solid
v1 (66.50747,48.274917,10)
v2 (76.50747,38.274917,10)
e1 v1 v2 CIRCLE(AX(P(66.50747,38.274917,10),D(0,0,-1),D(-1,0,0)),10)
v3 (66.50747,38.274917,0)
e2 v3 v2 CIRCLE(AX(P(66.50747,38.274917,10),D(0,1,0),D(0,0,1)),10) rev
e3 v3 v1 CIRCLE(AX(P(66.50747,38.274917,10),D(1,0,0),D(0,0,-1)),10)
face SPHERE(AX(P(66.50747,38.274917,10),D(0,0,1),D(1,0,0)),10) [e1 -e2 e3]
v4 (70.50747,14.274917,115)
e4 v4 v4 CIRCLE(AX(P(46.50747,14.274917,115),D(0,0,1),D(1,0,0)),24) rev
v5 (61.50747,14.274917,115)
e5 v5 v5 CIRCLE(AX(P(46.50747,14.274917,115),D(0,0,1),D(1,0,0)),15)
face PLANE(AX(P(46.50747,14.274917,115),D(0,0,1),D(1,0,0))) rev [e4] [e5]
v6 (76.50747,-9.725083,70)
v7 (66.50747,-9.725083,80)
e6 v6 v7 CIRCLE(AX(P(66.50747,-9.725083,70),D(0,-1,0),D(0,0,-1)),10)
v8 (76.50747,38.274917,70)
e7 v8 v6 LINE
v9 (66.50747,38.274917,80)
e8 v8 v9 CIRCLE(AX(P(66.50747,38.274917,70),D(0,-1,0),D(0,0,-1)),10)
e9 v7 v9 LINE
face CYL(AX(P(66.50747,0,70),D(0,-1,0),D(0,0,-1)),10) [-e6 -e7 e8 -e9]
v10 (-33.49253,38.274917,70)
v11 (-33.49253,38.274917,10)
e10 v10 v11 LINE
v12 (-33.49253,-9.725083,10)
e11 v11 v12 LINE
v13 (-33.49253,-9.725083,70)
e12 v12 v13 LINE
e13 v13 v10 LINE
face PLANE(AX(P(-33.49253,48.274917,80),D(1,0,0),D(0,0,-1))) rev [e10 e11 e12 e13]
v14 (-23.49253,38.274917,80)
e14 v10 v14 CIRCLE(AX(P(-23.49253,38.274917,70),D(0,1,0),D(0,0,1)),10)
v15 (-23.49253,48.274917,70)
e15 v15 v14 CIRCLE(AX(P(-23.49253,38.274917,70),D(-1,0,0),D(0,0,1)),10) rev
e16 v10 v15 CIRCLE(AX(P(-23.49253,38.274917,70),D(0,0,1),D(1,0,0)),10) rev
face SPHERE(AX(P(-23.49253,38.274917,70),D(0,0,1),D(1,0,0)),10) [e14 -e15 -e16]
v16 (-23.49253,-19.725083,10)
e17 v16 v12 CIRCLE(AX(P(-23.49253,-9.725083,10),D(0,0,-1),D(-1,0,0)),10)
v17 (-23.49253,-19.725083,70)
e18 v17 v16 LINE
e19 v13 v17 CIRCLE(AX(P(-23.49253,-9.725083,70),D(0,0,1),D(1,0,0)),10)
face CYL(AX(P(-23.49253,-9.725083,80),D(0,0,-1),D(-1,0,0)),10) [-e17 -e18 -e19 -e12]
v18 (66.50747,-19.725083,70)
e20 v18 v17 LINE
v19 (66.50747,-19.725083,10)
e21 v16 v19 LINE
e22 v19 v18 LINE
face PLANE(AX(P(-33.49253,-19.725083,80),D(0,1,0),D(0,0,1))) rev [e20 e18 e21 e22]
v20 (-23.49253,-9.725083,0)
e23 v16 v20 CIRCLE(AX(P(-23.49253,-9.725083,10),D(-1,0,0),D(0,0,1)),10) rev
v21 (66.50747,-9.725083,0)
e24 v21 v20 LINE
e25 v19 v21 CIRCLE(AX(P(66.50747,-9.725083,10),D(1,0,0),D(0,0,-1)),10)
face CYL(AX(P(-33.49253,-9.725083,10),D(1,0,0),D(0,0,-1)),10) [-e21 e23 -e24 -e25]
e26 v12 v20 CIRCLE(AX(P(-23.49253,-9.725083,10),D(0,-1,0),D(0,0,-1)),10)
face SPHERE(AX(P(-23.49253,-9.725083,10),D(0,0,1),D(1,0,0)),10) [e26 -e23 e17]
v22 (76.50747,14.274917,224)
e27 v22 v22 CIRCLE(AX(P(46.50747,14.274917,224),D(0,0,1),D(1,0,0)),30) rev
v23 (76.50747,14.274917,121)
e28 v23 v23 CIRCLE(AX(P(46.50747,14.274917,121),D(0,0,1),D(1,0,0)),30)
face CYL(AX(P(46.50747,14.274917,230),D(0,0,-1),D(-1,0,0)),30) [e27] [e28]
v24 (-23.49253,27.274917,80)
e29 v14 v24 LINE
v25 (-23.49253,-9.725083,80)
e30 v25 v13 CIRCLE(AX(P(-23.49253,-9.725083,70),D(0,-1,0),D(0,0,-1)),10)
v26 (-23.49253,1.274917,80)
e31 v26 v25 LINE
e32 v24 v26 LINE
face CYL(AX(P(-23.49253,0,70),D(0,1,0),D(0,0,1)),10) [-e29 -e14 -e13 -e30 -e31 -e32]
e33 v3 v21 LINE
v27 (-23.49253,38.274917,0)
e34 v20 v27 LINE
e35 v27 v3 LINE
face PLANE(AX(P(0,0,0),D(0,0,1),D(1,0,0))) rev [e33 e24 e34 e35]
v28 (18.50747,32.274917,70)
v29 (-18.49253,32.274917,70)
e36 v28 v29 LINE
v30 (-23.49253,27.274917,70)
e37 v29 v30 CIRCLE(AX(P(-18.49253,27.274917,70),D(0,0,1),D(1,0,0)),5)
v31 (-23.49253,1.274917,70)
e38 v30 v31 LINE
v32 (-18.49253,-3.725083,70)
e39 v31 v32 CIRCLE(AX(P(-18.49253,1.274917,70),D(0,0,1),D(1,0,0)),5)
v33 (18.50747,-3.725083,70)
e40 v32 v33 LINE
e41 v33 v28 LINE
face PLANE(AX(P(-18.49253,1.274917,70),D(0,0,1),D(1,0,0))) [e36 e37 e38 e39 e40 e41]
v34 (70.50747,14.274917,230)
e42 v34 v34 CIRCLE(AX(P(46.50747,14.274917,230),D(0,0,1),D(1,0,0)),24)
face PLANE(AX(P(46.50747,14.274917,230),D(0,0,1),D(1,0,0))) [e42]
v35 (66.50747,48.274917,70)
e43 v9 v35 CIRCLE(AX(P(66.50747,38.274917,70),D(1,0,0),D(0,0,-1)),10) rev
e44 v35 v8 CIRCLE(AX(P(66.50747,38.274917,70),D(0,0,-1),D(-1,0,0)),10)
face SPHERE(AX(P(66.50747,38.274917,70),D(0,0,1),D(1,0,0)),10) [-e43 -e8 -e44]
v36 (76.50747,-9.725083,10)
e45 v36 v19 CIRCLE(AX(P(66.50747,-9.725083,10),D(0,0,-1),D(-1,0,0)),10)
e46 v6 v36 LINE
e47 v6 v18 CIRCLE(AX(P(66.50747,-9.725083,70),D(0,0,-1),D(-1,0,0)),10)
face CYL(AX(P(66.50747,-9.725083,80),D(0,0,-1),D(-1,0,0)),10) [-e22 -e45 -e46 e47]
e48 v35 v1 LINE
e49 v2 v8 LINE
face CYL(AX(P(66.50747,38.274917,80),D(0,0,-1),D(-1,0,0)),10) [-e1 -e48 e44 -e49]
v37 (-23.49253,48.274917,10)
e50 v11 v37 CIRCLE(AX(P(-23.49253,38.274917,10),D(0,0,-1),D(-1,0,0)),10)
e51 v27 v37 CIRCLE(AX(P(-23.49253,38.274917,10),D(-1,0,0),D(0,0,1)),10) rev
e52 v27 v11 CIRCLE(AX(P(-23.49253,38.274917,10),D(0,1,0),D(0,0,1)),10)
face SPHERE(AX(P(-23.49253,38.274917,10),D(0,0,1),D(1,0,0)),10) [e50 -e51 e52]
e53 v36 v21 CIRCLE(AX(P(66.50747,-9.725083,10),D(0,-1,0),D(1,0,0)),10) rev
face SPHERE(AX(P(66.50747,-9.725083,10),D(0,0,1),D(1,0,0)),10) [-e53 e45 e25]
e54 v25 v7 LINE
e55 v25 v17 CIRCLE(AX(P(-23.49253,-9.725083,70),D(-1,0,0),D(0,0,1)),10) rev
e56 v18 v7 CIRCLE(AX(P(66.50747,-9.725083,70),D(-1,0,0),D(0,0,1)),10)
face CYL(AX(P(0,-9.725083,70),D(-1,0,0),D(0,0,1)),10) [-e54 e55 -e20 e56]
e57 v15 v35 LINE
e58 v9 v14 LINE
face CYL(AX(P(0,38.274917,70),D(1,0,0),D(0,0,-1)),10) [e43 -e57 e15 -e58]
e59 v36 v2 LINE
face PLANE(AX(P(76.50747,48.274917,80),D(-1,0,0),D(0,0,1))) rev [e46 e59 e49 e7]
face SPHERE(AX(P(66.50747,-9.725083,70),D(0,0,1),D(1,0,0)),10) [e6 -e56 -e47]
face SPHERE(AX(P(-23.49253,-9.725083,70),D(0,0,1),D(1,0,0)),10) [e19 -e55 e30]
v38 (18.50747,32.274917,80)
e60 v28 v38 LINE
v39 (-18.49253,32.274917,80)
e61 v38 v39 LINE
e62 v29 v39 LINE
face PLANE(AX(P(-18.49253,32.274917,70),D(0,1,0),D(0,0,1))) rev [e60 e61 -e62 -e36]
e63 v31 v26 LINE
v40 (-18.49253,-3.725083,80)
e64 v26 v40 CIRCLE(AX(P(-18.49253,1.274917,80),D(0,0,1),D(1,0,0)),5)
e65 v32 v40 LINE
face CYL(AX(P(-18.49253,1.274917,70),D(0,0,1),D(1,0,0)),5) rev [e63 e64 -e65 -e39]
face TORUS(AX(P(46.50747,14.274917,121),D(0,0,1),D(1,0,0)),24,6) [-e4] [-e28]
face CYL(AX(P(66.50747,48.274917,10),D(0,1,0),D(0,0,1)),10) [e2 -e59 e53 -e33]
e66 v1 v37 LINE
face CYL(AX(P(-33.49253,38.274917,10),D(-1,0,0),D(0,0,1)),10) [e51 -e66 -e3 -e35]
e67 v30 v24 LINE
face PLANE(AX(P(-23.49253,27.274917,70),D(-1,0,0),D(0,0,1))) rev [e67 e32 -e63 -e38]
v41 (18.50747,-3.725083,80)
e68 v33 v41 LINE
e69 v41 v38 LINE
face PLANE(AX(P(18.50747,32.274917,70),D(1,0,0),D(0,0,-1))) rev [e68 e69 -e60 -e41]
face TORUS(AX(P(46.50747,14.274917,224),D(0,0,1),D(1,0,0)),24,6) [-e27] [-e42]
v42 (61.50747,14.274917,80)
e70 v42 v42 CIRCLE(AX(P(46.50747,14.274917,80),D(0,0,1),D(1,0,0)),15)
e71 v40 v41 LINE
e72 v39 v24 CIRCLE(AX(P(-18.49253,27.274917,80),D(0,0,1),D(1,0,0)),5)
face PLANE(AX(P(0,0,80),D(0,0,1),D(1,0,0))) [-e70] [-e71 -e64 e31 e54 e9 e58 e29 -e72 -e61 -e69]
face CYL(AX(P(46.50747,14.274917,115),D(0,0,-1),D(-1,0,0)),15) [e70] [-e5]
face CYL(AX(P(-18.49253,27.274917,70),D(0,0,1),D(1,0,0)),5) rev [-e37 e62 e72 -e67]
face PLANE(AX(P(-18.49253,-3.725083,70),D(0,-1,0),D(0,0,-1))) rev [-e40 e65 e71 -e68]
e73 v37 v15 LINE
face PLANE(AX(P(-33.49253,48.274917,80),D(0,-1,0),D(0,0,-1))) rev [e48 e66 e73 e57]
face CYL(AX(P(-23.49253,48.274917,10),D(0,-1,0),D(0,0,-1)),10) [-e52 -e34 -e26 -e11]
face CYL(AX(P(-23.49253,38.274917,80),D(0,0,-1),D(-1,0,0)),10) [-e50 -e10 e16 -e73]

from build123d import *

# Parameters (mm, degrees)
ESQUISSE1_W             = 110
ESQUISSE1_H             = 68
BOSS_EXTRU_1_DEPTH      = 80
ESQUISSE2_R             = 30
BOSS_EXTRU_2_DEPTH      = 150
CONG_2_R                = 6
ESQUISSE8_R             = 30
ESQUISSE8_R_2           = 15
ENL_V_MAT_EXTRU_1_DEPTH = 35
CONG_3_R                = 6
CONG_4_R                = 10
CONG_5_R                = 10
ENL_V_MAT_EXTRU_2_DEPTH = 10


with BuildPart() as part:
    # Esquisse1 → Boss.-Extru.1 (new body)
    with BuildSketch(Plane.XY):
        with Locations((21.507469619, 14.274916944)):
            Rectangle(ESQUISSE1_W, ESQUISSE1_H)
    extrude(amount=BOSS_EXTRU_1_DEPTH)

    # Esquisse2 → Boss.-Extru.2 (add)
    with BuildSketch(Plane.XY.offset(80)):
        with Locations((46.507469619, 14.274916944)):
            Circle(ESQUISSE2_R)
    extrude(amount=BOSS_EXTRU_2_DEPTH)

    # Congé2
    cong_2_edges = [part.edges().sort_by_distance(p)[0] for p in [
        (16.507469619, 14.274916944, 230),
    ]]
    fillet(cong_2_edges, radius=CONG_2_R)

    # Esquisse8 → Enlèv. mat.-Extru.1 (cut)
    with BuildSketch(Plane.XY.offset(80)):
        with Locations((46.507469619, 14.274916944)):
            Circle(ESQUISSE8_R)
        with Locations((46.507469619, 14.274916944)):
            Circle(ESQUISSE8_R_2, mode=Mode.SUBTRACT)
    extrude(amount=ENL_V_MAT_EXTRU_1_DEPTH, mode=Mode.SUBTRACT)

    # Congé3
    cong_3_edges = [part.edges().sort_by_distance(p)[0] for p in [
        (16.507469619, 14.274916944, 115),
    ]]
    fillet(cong_3_edges, radius=CONG_3_R)

    # Congé4
    cong_4_edges = [part.edges().sort_by_distance(p)[0] for p in [
        (21.507469619, 48.274916944, 80),
        (-33.492530381, 14.274916944, 80),
        (21.507469619, 48.274916944, 0),
        (76.507469619, 14.274916944, 0),
        (21.507469619, -19.725083056, 0),
        (-33.492530381, 14.274916944, 0),
        (21.507469619, -19.725083056, 80),
        (-33.492530381, 48.274916944, 40),
        (76.507469619, 48.274916944, 40),
        (76.507469619, -19.725083056, 40),
        (-33.492530381, -19.725083056, 40),
    ]]
    fillet(cong_4_edges, radius=CONG_4_R)

    # Congé5
    # the kernel refuses this fillet: 10 mm, written as the material it takes off along each edge
    with BuildSketch(Plane(origin=(66.507469619, -9.725083056, 70), x_dir=(1, 0, 0), z_dir=(0, 0, 1))) as cong_5_piece_1_section:
        Polygon((0, 0), (CONG_5_R, 0), (CONG_5_R, -CONG_5_R), (0, -CONG_5_R), align=None)
    cong_5_piece_1 = extrude(amount=CONG_5_R, mode=Mode.PRIVATE)
    cong_5_piece_1 = cong_5_piece_1 - Plane(origin=(66.507469619, -9.725083056, 70), x_dir=(-0.7071067811865475, 0.7071067811865475, 0), z_dir=(0, 0, 1)) * Sphere(CONG_5_R, mode=Mode.PRIVATE)
    add(cong_5_piece_1, mode=Mode.SUBTRACT)
    with BuildSketch(Plane(origin=(66.507469619, 38.274916944, 70), x_dir=(1, 0, 0), z_dir=(0, 0, 1))) as cong_5_piece_2_section:
        Polygon((0, 0), (CONG_5_R, 0), (CONG_5_R, CONG_5_R), (0, CONG_5_R), align=None)
    cong_5_piece_2 = extrude(amount=CONG_5_R, mode=Mode.PRIVATE)
    cong_5_piece_2 = cong_5_piece_2 - Plane(origin=(66.507469619, 38.274916944, 70), x_dir=(-0.7071067811865475, -0.7071067811865475, 0), z_dir=(0, 0, 1)) * Sphere(CONG_5_R, mode=Mode.PRIVATE)
    add(cong_5_piece_2, mode=Mode.SUBTRACT)
    with BuildSketch(Plane(origin=(76.507469619, -9.725083056, 80), x_dir=(-1, 0, 0), z_dir=(0, 1, 0))) as cong_5_piece_3:
        with BuildLine():
            CenterArc((CONG_5_R, -CONG_5_R), CONG_5_R, 90, 90)
            Line((0, -CONG_5_R), (0, 0))
            Line((0, 0), (CONG_5_R, 0))
        make_face()
    extrude(amount=48, mode=Mode.SUBTRACT)

    # Esquisse9 → Enlèv. mat.-Extru.2 (cut)
    with BuildSketch(Plane.XY.offset(80)):
        with BuildLine():
            Line((-18.492530381, 32.274916944), (18.507469619, 32.274916944))
            Line((18.507469619, 32.274916944), (18.507469619, -3.725083056))
            Line((18.507469619, -3.725083056), (-18.492530381, -3.725083056))
            ThreePointArc((-18.492530381, -3.725083056), (-22.028064287, -2.260616962), (-23.492530381, 1.274916944))
            Line((-23.492530381, 1.274916944), (-23.492530381, 27.274916944))
            ThreePointArc((-23.492530381, 27.274916944), (-22.028064287, 30.810450849), (-18.492530381, 32.274916944))
        make_face()
    extrude(amount=-ENL_V_MAT_EXTRU_2_DEPTH, mode=Mode.SUBTRACT)


solid = part.part
